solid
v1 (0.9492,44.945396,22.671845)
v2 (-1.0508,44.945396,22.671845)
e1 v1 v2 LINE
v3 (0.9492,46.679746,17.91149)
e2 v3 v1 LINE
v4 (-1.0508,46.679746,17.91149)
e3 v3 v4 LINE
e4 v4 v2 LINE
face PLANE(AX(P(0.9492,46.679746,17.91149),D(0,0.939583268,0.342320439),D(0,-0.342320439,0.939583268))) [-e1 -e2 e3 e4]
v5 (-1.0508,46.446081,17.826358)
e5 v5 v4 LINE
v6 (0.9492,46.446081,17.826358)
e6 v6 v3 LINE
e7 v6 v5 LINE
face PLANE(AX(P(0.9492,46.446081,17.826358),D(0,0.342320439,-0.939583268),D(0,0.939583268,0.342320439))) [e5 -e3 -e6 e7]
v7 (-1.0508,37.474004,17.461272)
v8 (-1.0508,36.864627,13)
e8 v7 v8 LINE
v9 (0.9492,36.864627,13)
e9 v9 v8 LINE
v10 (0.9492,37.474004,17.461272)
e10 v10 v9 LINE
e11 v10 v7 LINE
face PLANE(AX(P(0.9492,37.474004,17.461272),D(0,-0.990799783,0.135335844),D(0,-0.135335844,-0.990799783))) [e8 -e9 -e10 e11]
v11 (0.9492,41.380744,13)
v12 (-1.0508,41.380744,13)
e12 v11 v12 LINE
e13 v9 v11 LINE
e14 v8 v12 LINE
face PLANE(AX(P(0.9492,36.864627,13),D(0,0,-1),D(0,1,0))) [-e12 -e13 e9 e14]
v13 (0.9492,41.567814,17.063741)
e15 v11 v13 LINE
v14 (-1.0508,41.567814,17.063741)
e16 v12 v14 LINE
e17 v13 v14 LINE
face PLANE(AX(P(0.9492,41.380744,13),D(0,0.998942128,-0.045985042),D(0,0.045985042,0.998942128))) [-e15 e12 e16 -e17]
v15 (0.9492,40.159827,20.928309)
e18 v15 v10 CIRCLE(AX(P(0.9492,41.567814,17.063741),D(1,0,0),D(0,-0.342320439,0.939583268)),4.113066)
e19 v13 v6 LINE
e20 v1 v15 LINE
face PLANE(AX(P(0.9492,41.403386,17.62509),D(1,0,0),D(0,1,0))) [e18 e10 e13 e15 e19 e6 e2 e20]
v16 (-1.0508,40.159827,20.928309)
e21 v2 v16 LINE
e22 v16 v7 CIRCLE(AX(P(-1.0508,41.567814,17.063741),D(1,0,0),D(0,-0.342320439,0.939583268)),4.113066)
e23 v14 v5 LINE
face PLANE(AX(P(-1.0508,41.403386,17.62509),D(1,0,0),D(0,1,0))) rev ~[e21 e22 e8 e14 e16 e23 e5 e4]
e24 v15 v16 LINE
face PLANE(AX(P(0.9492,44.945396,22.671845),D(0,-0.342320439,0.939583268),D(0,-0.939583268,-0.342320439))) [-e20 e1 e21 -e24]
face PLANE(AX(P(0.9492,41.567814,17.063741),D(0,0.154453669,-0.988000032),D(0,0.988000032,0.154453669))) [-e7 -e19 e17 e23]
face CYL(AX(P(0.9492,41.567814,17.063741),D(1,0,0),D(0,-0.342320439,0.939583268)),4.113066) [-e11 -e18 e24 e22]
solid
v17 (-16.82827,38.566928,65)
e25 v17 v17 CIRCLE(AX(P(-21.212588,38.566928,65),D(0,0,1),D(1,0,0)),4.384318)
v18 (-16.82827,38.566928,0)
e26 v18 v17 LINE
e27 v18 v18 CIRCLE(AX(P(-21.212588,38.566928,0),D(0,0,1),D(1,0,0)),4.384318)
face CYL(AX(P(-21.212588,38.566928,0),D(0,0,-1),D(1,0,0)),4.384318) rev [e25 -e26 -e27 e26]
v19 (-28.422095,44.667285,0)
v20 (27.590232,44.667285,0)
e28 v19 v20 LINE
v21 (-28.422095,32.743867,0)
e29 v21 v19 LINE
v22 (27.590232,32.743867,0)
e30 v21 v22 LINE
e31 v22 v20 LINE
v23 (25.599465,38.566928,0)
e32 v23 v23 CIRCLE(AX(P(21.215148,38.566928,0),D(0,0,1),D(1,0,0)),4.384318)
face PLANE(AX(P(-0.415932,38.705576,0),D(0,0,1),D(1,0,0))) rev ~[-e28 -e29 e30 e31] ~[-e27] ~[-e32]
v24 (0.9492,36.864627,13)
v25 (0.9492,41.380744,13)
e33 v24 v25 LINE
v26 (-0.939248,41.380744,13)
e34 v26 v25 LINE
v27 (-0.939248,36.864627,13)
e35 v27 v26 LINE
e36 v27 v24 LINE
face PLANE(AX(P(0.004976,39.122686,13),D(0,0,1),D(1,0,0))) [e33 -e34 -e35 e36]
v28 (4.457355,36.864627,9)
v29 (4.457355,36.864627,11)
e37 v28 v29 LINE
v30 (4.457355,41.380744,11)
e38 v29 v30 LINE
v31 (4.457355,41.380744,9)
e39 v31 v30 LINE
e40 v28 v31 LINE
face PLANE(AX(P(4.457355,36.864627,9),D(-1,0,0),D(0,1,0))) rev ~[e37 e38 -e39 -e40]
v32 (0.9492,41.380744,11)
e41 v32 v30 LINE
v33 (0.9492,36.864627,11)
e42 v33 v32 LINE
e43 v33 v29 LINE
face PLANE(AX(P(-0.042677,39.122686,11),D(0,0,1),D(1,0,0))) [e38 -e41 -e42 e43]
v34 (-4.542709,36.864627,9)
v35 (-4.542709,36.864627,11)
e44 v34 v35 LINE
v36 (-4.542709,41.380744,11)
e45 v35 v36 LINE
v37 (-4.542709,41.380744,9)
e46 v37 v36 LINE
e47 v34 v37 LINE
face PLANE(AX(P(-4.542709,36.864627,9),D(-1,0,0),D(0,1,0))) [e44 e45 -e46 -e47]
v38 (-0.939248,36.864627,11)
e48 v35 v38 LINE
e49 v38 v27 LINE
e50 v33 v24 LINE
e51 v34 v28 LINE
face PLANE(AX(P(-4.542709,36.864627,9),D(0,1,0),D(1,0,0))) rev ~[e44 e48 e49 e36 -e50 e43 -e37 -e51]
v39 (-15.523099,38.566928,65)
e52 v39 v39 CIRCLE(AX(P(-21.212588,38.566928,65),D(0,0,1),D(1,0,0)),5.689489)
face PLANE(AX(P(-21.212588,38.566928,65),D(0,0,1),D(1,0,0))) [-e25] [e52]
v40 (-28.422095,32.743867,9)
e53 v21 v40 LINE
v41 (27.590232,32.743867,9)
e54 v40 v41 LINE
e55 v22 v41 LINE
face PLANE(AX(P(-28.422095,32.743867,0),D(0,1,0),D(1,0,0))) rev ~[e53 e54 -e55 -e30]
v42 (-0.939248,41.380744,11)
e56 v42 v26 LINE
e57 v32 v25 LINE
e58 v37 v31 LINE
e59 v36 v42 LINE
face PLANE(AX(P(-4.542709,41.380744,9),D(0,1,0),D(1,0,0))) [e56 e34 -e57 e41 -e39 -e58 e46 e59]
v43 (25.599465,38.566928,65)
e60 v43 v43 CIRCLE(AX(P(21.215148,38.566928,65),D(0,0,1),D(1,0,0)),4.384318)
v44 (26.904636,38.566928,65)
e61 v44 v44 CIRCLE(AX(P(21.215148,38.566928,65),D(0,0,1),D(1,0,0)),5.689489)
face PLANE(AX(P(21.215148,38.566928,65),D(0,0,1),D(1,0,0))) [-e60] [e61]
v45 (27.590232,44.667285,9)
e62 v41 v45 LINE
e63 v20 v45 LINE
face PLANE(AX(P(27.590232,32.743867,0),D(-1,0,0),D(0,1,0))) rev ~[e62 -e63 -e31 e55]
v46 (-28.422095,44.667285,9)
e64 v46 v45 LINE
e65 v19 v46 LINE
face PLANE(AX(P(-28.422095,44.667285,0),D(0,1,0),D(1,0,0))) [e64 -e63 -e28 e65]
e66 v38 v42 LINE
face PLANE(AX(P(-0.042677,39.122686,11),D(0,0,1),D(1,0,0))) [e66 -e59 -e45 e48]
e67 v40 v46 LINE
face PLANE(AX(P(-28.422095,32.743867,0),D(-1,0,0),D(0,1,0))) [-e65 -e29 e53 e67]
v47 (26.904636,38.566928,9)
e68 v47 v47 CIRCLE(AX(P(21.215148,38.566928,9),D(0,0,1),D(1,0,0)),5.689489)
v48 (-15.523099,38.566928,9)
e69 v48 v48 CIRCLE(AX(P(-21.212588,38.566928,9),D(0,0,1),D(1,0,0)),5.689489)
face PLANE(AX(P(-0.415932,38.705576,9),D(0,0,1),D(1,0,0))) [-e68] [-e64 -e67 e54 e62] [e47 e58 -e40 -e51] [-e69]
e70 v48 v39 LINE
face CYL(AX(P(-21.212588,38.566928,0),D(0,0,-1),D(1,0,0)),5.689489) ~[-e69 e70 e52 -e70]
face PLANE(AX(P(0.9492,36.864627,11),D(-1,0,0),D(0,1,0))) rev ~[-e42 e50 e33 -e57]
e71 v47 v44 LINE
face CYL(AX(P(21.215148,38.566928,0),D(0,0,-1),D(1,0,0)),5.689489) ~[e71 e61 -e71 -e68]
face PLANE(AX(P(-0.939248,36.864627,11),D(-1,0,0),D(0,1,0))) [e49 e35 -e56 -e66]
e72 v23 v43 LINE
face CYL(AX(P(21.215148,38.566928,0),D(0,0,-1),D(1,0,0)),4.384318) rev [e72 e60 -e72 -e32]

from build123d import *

# Parameters (mm, degrees)
F0_R     = 5.6894885444
F0_R_2   = 4.3843175031
F1_DEPTH = 65
F0_W     = 56.0123268515
F0_H     = 11.923417449
F2_DEPTH = 9
F3_W     = 9.0000643395
F3_H     = 4.5161172748
F4_DEPTH = 2
F5_W     = 1.888447674
F5_H     = 4.5161172748
F6_DEPTH = 2
F8_DEPTH = 2


with BuildPart() as f1:
    # F0 (on Top) → F1 (new body)
    with BuildSketch(Plane.XY):
        with Locations((-21.2125875842, 38.5669283569)):
            Circle(F0_R)
        with Locations((-21.2125875842, 38.5669283569)):
            Circle(F0_R_2, mode=Mode.SUBTRACT)
    extrude(amount=F1_DEPTH)



with BuildPart() as f1b:
    # F0 (on Top) → F1, piece 2 (new body)
    with BuildSketch(Plane.XY):
        with Locations((21.215147819, 38.5669283569)):
            Circle(F0_R)
        with Locations((21.215147819, 38.5669283569)):
            Circle(F0_R_2, mode=Mode.SUBTRACT)
    extrude(amount=F1_DEPTH)


with BuildPart() as f1_1:
    add(f1.part)

    add(f1b.part)  # F2 merges F1b
    # F0 (on Top) → F2 (join)
    with BuildSketch(Plane.XY):
        with Locations((-0.4159319069, 38.7055762112)):
            Rectangle(F0_W, F0_H)
        with Locations((-21.2125875842, 38.5669283569)):
            Circle(F0_R, mode=Mode.SUBTRACT)
        with Locations((21.215147819, 38.5669283569)):
            Circle(F0_R, mode=Mode.SUBTRACT)
    extrude(amount=F2_DEPTH)

    # F3 (on face) → F4 (join)
    with BuildSketch(Plane.XY.offset(9)):
        with Locations((-0.0426771585, 39.1226857901)):
            Rectangle(F3_W, F3_H)
    extrude(amount=F4_DEPTH)

    # F5 (on face) → F6 (join)
    with BuildSketch(Plane.XY.offset(11)):
        with Locations((0.0049760565, 39.1226857901)):
            Rectangle(F5_W, F5_H)
    extrude(amount=F6_DEPTH)


with BuildPart() as f8:
    # F7 (on face) → F8 (new body)
    with BuildSketch(Plane.YZ.offset(0.9491998935)):
        with BuildLine():
            Line((37.4740036153, 17.461272415), (36.8646271527, 13))
            Line((36.8646271527, 13), (41.3807444274, 13))
            Line((41.3807444274, 13), (41.5678136051, 17.0637406409))
            Line((41.5678136051, 17.0637406409), (46.4460814167, 17.8263583901))
            Line((46.4460814167, 17.8263583901), (46.6797463596, 17.9114900529))
            Line((46.6797463596, 17.9114900529), (44.94539564, 22.6718453473))
            Line((44.94539564, 22.6718453473), (40.1598270518, 20.9283086128))
            ThreePointArc((40.1598270518, 20.9283086128), (38.3162714633, 19.5826263954), (37.4740036153, 17.461272415))
        make_face()
    extrude(amount=-F8_DEPTH)


solid = Compound([f1_1.part, f8.part])
